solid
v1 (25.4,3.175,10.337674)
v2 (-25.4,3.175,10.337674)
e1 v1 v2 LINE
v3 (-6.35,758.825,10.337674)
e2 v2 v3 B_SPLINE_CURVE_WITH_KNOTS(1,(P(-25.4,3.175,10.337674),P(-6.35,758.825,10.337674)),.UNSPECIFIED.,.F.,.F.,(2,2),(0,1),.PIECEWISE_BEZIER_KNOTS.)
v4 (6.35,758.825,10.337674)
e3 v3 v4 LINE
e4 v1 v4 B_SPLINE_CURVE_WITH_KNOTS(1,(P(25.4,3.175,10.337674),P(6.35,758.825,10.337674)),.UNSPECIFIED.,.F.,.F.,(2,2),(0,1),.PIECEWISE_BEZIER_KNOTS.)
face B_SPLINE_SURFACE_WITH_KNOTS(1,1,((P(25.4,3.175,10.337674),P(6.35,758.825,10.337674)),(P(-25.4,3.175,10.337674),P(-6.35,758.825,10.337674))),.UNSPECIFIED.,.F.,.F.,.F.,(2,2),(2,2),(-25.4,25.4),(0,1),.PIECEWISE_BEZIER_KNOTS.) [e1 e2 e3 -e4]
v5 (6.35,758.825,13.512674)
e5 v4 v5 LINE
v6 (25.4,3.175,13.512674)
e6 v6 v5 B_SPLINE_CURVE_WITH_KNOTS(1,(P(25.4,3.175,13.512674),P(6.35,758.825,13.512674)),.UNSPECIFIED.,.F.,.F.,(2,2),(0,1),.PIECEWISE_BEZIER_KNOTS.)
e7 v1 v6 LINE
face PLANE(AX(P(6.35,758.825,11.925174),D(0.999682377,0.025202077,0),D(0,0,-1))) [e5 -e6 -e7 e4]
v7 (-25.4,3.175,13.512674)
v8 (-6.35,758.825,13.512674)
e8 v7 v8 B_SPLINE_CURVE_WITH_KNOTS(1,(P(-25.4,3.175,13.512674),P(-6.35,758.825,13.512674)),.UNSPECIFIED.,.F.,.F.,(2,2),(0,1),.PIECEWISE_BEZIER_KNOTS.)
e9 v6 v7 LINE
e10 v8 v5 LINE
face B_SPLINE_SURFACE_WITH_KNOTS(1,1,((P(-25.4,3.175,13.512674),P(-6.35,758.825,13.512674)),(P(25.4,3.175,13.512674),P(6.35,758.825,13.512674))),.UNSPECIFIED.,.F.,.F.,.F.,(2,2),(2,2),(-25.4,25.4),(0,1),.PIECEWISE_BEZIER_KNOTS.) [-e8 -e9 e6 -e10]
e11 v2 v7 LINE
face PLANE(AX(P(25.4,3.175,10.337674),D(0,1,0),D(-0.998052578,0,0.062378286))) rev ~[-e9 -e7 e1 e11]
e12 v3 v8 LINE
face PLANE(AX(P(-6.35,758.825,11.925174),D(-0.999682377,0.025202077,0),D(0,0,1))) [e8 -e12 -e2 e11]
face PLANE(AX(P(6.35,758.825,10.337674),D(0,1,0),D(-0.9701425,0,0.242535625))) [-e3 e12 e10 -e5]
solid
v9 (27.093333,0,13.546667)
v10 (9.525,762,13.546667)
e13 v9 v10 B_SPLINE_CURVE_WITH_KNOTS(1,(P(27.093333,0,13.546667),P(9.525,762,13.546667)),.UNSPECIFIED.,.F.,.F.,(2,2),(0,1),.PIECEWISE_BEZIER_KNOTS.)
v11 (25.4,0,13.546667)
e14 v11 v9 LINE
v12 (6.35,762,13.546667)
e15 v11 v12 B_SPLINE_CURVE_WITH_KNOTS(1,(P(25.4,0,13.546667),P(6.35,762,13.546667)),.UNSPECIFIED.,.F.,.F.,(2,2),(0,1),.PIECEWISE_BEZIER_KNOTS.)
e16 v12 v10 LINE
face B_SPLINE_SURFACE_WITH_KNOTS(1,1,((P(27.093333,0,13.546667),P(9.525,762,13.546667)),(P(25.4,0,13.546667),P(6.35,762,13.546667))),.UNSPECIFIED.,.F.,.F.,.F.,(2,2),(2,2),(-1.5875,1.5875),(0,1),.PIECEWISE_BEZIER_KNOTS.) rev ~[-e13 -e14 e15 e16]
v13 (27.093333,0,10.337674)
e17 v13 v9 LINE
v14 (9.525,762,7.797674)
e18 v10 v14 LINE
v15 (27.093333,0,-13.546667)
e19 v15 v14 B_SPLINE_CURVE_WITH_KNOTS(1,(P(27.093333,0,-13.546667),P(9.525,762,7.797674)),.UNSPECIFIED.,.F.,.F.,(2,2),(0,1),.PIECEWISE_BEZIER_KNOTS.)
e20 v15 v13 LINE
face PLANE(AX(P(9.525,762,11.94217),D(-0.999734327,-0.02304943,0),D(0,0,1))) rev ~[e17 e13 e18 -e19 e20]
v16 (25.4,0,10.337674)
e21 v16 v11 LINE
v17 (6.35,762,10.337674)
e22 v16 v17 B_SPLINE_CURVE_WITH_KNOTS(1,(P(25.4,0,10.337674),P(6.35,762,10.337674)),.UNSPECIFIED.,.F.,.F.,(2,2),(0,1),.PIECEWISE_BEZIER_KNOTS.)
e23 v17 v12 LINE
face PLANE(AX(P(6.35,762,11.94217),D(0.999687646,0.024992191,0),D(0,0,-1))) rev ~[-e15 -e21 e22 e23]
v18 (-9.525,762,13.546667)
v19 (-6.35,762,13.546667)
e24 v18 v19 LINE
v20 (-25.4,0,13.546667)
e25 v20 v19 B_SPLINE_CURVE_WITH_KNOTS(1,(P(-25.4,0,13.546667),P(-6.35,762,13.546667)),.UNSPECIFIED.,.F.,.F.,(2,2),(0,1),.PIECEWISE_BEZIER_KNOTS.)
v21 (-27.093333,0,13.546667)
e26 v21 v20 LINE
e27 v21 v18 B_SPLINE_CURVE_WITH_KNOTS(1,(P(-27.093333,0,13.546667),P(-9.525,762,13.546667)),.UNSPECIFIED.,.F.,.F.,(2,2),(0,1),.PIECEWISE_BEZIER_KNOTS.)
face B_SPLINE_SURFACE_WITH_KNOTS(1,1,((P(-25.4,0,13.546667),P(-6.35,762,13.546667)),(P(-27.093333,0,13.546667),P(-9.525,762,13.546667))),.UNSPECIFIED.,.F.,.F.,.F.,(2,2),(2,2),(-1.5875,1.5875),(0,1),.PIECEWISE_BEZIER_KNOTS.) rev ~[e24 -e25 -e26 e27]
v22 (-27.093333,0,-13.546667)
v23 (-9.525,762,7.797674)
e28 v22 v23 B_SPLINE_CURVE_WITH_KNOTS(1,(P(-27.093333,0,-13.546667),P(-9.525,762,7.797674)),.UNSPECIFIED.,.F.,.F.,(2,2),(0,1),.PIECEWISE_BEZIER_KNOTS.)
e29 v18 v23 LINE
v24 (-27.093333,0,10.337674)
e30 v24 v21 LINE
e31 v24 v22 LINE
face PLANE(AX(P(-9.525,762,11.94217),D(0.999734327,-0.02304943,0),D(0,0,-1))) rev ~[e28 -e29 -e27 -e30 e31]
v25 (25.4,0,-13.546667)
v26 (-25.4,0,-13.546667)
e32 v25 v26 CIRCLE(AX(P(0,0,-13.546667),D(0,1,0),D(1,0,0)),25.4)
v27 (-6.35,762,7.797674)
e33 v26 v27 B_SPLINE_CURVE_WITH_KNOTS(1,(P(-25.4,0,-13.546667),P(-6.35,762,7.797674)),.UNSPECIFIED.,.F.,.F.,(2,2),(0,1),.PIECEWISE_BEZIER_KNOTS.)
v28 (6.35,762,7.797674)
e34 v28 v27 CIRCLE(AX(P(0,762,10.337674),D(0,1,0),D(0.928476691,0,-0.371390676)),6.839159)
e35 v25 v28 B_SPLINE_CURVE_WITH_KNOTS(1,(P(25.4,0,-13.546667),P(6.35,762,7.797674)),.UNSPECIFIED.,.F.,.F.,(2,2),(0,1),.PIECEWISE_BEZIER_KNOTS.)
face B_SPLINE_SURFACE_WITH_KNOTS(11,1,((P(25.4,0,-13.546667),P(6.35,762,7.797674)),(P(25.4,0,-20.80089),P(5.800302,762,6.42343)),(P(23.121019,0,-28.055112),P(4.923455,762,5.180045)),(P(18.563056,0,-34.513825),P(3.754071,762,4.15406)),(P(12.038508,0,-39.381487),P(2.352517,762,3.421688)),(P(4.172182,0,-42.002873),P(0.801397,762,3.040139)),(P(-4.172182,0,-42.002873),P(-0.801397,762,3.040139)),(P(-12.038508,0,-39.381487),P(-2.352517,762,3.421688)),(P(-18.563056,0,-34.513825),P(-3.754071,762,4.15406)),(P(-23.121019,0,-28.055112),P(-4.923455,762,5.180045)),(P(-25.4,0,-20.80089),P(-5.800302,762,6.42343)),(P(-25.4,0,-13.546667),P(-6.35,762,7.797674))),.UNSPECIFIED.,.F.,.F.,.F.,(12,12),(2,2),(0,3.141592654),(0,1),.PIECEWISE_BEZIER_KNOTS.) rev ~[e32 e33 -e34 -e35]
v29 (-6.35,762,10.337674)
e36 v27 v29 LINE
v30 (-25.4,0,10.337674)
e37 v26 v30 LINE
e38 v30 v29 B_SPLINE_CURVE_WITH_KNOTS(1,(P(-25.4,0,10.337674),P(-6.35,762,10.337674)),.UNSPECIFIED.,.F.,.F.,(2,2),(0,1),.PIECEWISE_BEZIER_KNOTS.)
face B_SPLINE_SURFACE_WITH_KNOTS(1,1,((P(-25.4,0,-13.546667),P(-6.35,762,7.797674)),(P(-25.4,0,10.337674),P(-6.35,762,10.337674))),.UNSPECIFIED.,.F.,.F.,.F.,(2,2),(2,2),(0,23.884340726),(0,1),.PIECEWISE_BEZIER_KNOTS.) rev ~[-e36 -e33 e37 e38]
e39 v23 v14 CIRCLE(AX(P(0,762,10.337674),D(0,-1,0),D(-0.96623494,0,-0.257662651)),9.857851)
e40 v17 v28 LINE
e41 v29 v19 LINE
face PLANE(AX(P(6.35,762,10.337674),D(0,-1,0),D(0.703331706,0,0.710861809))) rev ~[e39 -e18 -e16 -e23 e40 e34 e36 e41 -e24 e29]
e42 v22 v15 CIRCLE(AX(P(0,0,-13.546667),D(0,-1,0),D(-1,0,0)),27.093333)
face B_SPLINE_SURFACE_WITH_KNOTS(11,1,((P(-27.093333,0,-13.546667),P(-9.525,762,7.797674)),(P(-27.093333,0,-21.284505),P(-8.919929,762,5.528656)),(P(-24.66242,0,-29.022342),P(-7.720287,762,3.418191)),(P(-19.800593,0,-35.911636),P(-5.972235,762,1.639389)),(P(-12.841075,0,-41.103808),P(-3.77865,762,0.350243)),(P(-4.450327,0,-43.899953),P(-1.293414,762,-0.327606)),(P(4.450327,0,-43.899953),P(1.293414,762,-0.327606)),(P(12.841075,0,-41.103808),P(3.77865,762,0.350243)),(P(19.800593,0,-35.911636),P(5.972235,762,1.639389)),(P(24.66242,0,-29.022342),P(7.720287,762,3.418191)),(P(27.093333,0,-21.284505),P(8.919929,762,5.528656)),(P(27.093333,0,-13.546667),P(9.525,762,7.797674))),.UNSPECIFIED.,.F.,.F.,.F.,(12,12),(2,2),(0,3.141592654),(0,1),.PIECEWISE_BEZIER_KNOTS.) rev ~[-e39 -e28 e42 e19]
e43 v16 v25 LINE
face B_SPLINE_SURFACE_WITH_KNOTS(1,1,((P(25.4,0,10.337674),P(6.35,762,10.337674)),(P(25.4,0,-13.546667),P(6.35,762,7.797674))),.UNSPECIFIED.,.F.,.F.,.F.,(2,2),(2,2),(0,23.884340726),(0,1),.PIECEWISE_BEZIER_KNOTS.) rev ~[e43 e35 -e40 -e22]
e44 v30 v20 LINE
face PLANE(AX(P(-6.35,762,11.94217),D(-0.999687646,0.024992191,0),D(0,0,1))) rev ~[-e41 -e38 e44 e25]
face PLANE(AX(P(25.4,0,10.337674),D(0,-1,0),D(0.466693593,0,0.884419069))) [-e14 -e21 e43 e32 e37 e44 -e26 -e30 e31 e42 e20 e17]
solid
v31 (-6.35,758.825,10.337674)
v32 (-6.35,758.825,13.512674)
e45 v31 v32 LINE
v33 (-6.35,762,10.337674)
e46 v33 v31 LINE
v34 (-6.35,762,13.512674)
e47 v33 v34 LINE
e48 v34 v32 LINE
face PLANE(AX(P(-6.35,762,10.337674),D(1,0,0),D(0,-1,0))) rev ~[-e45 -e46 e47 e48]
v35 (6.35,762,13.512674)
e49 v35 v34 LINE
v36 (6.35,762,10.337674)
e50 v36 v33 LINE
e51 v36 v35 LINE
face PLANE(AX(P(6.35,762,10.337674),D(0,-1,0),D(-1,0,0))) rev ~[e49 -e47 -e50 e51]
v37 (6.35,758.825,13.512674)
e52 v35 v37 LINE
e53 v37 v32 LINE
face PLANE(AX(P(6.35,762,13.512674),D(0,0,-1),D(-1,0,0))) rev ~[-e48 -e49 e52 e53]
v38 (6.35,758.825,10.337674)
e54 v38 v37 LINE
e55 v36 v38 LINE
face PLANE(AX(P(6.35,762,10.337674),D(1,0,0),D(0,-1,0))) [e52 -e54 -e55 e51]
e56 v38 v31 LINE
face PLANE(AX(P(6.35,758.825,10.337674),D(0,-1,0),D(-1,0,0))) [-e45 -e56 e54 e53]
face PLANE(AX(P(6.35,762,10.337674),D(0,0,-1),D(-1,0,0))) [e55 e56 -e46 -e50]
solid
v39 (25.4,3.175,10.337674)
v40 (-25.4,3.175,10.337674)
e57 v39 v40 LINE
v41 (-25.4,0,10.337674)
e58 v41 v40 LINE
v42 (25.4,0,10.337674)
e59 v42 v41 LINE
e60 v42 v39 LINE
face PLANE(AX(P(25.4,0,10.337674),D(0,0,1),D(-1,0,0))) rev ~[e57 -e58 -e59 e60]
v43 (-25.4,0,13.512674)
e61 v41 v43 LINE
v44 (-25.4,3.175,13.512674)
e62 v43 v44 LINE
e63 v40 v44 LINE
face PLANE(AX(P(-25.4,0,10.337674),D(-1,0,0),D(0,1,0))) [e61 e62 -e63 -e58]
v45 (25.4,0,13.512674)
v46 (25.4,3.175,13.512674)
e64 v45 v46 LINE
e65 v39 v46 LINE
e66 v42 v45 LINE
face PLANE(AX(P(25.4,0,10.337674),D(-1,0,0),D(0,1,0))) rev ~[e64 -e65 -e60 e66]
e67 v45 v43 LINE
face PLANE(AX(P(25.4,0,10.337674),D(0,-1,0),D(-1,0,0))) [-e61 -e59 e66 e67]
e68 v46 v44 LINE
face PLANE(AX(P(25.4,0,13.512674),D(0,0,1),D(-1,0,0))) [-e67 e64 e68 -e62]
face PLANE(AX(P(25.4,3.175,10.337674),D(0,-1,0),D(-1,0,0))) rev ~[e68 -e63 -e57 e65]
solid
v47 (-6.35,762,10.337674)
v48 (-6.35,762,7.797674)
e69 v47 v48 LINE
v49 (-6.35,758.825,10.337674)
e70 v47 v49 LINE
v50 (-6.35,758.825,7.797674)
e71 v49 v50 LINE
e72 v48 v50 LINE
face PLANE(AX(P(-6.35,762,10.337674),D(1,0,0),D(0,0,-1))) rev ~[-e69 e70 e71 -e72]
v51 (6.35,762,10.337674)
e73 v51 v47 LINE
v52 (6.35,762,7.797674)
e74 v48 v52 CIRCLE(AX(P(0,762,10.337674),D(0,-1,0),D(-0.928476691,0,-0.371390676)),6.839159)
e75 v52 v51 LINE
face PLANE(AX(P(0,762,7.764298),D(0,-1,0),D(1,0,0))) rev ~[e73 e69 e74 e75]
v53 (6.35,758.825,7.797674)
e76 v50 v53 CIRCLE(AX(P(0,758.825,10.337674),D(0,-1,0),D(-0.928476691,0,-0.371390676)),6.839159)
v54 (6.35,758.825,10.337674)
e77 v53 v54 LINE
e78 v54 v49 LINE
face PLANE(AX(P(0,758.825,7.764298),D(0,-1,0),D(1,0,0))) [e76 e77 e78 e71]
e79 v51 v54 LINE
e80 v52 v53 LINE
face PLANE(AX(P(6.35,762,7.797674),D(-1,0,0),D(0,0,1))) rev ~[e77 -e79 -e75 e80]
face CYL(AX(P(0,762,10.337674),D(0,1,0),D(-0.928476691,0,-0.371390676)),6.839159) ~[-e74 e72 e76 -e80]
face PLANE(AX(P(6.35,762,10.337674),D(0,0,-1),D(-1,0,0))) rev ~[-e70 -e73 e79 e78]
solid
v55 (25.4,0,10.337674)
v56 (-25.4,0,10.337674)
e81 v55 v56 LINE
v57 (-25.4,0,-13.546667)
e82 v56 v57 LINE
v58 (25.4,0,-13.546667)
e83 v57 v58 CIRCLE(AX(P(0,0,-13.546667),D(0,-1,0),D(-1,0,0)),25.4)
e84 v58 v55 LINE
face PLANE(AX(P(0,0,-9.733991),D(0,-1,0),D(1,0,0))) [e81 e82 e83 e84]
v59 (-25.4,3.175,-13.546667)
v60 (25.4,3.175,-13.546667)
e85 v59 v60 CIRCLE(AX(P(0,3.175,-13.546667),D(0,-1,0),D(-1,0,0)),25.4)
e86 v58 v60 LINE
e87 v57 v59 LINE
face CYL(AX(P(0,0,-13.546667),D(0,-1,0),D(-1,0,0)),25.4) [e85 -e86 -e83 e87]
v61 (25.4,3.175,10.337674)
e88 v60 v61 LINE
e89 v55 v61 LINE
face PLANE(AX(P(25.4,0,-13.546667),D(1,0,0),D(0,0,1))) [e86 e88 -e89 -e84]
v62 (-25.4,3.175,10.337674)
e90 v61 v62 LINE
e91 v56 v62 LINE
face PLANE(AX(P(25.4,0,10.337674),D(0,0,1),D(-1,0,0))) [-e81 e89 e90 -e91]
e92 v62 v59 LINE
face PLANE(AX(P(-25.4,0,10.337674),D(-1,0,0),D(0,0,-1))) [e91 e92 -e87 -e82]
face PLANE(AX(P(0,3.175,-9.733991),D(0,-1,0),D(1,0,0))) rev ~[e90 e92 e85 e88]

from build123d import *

# Parameters (mm, degrees)
F1_DEPTH  = 3.175
F0_W      = 1.6933333333
F0_H      = 3.2089926077
F3_W      = 3.175
F3_H      = 3.2089926077
F7_DEPTH  = 3.175
F8_DEPTH  = 3.175
F9_DEPTH  = 3.175
F9_FACE_W = 50.8
F9_FACE_H = 3.175
F8_FACE_W = 12.7
F8_FACE_H = 3.175


with BuildPart() as f1:
    # F0 (on Front) → F1 (new body)
    with BuildSketch(Plane.XZ):
        with BuildLine():
            Line((25.4, -13.5466666667), (25.4, 10.337674059))
            Line((25.4, 10.337674059), (-25.4, 10.337674059))
            Line((-25.4, 10.337674059), (-25.4, -13.5466666667))
            ThreePointArc((-25.4, -13.5466666667), (0, -38.9466666667), (25.4, -13.5466666667))
        make_face()
    extrude(amount=-F1_DEPTH)


with BuildPart() as f4:
    # F0 (on Front) → F4 section 0
    with BuildSketch(Plane.XZ):
        with BuildLine():
            ThreePointArc((-27.0933333333, -13.5466666667), (0, -40.64), (27.0933333333, -13.5466666667))
            Line((27.0933333333, -13.5466666667), (27.0933333333, 10.337674059))
            Line((27.0933333333, 10.337674059), (25.4, 10.337674059))
            Line((25.4, 10.337674059), (25.4, -13.5466666667))
            ThreePointArc((25.4, -13.5466666667), (0, -38.9466666667), (-25.4, -13.5466666667))
            Line((-25.4, -13.5466666667), (-25.4, 10.337674059))
            Line((-25.4, 10.337674059), (-27.0933333333, 10.337674059))
            Line((-27.0933333333, 10.337674059), (-27.0933333333, -13.5466666667))
        make_face()
    # F3 (on offset) → F4 section 1
    with BuildSketch(Plane.XZ.offset(-762)):
        with BuildLine():
            Line((-6.35, 10.337674059), (-9.525, 10.337674059))
            Line((-9.525, 10.337674059), (-9.525, 7.797674059))
            ThreePointArc((-9.525, 7.797674059), (0, 0.4798231268), (9.525, 7.797674059))
            Line((9.525, 7.797674059), (9.525, 10.337674059))
            Line((9.525, 10.337674059), (6.35, 10.337674059))
            Line((6.35, 10.337674059), (6.35, 7.797674059))
            ThreePointArc((6.35, 7.797674059), (0, 3.4985147539), (-6.35, 7.797674059))
            Line((-6.35, 7.797674059), (-6.35, 10.337674059))
        make_face()
    loft()

    # F0 (on Front) → F5 section 0
    with BuildSketch(Plane.XZ):
        with Locations((-26.2466666667, 11.9421703628)):
            Rectangle(F0_W, F0_H)
    # F3 (on offset) → F5 section 1
    with BuildSketch(Plane.XZ.offset(-762)):
        with Locations((-7.9375, 11.9421703628)):
            Rectangle(F3_W, F3_H)
    loft()

    # F0 (on Front) → F6 section 0
    with BuildSketch(Plane.XZ):
        with Locations((26.2466666667, 11.9421703628)):
            Rectangle(F0_W, F0_H)
    # F3 (on offset) → F6 section 1
    with BuildSketch(Plane.XZ.offset(-762)):
        with Locations((7.9375, 11.9421703628)):
            Rectangle(F3_W, F3_H)
    loft()


with BuildPart() as f7:
    # F3 (on offset) → F7 (new body)
    with BuildSketch(Plane.XZ.offset(-762)):
        with BuildLine():
            Line((6.35, 10.337674059), (-6.35, 10.337674059))
            Line((-6.35, 10.337674059), (-6.35, 7.797674059))
            ThreePointArc((-6.35, 7.797674059), (0, 3.4985147539), (6.35, 7.797674059))
            Line((6.35, 7.797674059), (6.35, 10.337674059))
        make_face()
    extrude(amount=F7_DEPTH)


with BuildPart() as f8:
    # F8 (new): a face of the model
    f8_faces = [f7.part.faces().sort_by_distance(p)[0] for p in [
        (0, 760.4125, 10.337674059),
    ]]
    extrude(f8_faces, amount=F8_DEPTH)


with BuildPart() as f9:
    # F9 (new): a face of the model
    f9_faces = [f1.part.faces().sort_by_distance(p)[0] for p in [
        (0, 1.5875, 10.337674059),
    ]]
    extrude(f9_faces, amount=F9_DEPTH)


with BuildPart() as f10:
    # F9_face (on face) → F10 section 0
    with BuildSketch(Plane(origin=(0, 3.175, 11.925174059), x_dir=(-1, 0, 0), z_dir=(0, 1, 0))):
        Rectangle(F9_FACE_W, F9_FACE_H)
    # F8_face (on face) → F10 section 1
    with BuildSketch(Plane(origin=(0, 758.825, 11.925174059), x_dir=(1, 0, 0), z_dir=(0, -1, 0))):
        Rectangle(F8_FACE_W, F8_FACE_H)
    loft()


solid = Compound([f1.part, f4.part, f7.part, f8.part, f9.part, f10.part])
